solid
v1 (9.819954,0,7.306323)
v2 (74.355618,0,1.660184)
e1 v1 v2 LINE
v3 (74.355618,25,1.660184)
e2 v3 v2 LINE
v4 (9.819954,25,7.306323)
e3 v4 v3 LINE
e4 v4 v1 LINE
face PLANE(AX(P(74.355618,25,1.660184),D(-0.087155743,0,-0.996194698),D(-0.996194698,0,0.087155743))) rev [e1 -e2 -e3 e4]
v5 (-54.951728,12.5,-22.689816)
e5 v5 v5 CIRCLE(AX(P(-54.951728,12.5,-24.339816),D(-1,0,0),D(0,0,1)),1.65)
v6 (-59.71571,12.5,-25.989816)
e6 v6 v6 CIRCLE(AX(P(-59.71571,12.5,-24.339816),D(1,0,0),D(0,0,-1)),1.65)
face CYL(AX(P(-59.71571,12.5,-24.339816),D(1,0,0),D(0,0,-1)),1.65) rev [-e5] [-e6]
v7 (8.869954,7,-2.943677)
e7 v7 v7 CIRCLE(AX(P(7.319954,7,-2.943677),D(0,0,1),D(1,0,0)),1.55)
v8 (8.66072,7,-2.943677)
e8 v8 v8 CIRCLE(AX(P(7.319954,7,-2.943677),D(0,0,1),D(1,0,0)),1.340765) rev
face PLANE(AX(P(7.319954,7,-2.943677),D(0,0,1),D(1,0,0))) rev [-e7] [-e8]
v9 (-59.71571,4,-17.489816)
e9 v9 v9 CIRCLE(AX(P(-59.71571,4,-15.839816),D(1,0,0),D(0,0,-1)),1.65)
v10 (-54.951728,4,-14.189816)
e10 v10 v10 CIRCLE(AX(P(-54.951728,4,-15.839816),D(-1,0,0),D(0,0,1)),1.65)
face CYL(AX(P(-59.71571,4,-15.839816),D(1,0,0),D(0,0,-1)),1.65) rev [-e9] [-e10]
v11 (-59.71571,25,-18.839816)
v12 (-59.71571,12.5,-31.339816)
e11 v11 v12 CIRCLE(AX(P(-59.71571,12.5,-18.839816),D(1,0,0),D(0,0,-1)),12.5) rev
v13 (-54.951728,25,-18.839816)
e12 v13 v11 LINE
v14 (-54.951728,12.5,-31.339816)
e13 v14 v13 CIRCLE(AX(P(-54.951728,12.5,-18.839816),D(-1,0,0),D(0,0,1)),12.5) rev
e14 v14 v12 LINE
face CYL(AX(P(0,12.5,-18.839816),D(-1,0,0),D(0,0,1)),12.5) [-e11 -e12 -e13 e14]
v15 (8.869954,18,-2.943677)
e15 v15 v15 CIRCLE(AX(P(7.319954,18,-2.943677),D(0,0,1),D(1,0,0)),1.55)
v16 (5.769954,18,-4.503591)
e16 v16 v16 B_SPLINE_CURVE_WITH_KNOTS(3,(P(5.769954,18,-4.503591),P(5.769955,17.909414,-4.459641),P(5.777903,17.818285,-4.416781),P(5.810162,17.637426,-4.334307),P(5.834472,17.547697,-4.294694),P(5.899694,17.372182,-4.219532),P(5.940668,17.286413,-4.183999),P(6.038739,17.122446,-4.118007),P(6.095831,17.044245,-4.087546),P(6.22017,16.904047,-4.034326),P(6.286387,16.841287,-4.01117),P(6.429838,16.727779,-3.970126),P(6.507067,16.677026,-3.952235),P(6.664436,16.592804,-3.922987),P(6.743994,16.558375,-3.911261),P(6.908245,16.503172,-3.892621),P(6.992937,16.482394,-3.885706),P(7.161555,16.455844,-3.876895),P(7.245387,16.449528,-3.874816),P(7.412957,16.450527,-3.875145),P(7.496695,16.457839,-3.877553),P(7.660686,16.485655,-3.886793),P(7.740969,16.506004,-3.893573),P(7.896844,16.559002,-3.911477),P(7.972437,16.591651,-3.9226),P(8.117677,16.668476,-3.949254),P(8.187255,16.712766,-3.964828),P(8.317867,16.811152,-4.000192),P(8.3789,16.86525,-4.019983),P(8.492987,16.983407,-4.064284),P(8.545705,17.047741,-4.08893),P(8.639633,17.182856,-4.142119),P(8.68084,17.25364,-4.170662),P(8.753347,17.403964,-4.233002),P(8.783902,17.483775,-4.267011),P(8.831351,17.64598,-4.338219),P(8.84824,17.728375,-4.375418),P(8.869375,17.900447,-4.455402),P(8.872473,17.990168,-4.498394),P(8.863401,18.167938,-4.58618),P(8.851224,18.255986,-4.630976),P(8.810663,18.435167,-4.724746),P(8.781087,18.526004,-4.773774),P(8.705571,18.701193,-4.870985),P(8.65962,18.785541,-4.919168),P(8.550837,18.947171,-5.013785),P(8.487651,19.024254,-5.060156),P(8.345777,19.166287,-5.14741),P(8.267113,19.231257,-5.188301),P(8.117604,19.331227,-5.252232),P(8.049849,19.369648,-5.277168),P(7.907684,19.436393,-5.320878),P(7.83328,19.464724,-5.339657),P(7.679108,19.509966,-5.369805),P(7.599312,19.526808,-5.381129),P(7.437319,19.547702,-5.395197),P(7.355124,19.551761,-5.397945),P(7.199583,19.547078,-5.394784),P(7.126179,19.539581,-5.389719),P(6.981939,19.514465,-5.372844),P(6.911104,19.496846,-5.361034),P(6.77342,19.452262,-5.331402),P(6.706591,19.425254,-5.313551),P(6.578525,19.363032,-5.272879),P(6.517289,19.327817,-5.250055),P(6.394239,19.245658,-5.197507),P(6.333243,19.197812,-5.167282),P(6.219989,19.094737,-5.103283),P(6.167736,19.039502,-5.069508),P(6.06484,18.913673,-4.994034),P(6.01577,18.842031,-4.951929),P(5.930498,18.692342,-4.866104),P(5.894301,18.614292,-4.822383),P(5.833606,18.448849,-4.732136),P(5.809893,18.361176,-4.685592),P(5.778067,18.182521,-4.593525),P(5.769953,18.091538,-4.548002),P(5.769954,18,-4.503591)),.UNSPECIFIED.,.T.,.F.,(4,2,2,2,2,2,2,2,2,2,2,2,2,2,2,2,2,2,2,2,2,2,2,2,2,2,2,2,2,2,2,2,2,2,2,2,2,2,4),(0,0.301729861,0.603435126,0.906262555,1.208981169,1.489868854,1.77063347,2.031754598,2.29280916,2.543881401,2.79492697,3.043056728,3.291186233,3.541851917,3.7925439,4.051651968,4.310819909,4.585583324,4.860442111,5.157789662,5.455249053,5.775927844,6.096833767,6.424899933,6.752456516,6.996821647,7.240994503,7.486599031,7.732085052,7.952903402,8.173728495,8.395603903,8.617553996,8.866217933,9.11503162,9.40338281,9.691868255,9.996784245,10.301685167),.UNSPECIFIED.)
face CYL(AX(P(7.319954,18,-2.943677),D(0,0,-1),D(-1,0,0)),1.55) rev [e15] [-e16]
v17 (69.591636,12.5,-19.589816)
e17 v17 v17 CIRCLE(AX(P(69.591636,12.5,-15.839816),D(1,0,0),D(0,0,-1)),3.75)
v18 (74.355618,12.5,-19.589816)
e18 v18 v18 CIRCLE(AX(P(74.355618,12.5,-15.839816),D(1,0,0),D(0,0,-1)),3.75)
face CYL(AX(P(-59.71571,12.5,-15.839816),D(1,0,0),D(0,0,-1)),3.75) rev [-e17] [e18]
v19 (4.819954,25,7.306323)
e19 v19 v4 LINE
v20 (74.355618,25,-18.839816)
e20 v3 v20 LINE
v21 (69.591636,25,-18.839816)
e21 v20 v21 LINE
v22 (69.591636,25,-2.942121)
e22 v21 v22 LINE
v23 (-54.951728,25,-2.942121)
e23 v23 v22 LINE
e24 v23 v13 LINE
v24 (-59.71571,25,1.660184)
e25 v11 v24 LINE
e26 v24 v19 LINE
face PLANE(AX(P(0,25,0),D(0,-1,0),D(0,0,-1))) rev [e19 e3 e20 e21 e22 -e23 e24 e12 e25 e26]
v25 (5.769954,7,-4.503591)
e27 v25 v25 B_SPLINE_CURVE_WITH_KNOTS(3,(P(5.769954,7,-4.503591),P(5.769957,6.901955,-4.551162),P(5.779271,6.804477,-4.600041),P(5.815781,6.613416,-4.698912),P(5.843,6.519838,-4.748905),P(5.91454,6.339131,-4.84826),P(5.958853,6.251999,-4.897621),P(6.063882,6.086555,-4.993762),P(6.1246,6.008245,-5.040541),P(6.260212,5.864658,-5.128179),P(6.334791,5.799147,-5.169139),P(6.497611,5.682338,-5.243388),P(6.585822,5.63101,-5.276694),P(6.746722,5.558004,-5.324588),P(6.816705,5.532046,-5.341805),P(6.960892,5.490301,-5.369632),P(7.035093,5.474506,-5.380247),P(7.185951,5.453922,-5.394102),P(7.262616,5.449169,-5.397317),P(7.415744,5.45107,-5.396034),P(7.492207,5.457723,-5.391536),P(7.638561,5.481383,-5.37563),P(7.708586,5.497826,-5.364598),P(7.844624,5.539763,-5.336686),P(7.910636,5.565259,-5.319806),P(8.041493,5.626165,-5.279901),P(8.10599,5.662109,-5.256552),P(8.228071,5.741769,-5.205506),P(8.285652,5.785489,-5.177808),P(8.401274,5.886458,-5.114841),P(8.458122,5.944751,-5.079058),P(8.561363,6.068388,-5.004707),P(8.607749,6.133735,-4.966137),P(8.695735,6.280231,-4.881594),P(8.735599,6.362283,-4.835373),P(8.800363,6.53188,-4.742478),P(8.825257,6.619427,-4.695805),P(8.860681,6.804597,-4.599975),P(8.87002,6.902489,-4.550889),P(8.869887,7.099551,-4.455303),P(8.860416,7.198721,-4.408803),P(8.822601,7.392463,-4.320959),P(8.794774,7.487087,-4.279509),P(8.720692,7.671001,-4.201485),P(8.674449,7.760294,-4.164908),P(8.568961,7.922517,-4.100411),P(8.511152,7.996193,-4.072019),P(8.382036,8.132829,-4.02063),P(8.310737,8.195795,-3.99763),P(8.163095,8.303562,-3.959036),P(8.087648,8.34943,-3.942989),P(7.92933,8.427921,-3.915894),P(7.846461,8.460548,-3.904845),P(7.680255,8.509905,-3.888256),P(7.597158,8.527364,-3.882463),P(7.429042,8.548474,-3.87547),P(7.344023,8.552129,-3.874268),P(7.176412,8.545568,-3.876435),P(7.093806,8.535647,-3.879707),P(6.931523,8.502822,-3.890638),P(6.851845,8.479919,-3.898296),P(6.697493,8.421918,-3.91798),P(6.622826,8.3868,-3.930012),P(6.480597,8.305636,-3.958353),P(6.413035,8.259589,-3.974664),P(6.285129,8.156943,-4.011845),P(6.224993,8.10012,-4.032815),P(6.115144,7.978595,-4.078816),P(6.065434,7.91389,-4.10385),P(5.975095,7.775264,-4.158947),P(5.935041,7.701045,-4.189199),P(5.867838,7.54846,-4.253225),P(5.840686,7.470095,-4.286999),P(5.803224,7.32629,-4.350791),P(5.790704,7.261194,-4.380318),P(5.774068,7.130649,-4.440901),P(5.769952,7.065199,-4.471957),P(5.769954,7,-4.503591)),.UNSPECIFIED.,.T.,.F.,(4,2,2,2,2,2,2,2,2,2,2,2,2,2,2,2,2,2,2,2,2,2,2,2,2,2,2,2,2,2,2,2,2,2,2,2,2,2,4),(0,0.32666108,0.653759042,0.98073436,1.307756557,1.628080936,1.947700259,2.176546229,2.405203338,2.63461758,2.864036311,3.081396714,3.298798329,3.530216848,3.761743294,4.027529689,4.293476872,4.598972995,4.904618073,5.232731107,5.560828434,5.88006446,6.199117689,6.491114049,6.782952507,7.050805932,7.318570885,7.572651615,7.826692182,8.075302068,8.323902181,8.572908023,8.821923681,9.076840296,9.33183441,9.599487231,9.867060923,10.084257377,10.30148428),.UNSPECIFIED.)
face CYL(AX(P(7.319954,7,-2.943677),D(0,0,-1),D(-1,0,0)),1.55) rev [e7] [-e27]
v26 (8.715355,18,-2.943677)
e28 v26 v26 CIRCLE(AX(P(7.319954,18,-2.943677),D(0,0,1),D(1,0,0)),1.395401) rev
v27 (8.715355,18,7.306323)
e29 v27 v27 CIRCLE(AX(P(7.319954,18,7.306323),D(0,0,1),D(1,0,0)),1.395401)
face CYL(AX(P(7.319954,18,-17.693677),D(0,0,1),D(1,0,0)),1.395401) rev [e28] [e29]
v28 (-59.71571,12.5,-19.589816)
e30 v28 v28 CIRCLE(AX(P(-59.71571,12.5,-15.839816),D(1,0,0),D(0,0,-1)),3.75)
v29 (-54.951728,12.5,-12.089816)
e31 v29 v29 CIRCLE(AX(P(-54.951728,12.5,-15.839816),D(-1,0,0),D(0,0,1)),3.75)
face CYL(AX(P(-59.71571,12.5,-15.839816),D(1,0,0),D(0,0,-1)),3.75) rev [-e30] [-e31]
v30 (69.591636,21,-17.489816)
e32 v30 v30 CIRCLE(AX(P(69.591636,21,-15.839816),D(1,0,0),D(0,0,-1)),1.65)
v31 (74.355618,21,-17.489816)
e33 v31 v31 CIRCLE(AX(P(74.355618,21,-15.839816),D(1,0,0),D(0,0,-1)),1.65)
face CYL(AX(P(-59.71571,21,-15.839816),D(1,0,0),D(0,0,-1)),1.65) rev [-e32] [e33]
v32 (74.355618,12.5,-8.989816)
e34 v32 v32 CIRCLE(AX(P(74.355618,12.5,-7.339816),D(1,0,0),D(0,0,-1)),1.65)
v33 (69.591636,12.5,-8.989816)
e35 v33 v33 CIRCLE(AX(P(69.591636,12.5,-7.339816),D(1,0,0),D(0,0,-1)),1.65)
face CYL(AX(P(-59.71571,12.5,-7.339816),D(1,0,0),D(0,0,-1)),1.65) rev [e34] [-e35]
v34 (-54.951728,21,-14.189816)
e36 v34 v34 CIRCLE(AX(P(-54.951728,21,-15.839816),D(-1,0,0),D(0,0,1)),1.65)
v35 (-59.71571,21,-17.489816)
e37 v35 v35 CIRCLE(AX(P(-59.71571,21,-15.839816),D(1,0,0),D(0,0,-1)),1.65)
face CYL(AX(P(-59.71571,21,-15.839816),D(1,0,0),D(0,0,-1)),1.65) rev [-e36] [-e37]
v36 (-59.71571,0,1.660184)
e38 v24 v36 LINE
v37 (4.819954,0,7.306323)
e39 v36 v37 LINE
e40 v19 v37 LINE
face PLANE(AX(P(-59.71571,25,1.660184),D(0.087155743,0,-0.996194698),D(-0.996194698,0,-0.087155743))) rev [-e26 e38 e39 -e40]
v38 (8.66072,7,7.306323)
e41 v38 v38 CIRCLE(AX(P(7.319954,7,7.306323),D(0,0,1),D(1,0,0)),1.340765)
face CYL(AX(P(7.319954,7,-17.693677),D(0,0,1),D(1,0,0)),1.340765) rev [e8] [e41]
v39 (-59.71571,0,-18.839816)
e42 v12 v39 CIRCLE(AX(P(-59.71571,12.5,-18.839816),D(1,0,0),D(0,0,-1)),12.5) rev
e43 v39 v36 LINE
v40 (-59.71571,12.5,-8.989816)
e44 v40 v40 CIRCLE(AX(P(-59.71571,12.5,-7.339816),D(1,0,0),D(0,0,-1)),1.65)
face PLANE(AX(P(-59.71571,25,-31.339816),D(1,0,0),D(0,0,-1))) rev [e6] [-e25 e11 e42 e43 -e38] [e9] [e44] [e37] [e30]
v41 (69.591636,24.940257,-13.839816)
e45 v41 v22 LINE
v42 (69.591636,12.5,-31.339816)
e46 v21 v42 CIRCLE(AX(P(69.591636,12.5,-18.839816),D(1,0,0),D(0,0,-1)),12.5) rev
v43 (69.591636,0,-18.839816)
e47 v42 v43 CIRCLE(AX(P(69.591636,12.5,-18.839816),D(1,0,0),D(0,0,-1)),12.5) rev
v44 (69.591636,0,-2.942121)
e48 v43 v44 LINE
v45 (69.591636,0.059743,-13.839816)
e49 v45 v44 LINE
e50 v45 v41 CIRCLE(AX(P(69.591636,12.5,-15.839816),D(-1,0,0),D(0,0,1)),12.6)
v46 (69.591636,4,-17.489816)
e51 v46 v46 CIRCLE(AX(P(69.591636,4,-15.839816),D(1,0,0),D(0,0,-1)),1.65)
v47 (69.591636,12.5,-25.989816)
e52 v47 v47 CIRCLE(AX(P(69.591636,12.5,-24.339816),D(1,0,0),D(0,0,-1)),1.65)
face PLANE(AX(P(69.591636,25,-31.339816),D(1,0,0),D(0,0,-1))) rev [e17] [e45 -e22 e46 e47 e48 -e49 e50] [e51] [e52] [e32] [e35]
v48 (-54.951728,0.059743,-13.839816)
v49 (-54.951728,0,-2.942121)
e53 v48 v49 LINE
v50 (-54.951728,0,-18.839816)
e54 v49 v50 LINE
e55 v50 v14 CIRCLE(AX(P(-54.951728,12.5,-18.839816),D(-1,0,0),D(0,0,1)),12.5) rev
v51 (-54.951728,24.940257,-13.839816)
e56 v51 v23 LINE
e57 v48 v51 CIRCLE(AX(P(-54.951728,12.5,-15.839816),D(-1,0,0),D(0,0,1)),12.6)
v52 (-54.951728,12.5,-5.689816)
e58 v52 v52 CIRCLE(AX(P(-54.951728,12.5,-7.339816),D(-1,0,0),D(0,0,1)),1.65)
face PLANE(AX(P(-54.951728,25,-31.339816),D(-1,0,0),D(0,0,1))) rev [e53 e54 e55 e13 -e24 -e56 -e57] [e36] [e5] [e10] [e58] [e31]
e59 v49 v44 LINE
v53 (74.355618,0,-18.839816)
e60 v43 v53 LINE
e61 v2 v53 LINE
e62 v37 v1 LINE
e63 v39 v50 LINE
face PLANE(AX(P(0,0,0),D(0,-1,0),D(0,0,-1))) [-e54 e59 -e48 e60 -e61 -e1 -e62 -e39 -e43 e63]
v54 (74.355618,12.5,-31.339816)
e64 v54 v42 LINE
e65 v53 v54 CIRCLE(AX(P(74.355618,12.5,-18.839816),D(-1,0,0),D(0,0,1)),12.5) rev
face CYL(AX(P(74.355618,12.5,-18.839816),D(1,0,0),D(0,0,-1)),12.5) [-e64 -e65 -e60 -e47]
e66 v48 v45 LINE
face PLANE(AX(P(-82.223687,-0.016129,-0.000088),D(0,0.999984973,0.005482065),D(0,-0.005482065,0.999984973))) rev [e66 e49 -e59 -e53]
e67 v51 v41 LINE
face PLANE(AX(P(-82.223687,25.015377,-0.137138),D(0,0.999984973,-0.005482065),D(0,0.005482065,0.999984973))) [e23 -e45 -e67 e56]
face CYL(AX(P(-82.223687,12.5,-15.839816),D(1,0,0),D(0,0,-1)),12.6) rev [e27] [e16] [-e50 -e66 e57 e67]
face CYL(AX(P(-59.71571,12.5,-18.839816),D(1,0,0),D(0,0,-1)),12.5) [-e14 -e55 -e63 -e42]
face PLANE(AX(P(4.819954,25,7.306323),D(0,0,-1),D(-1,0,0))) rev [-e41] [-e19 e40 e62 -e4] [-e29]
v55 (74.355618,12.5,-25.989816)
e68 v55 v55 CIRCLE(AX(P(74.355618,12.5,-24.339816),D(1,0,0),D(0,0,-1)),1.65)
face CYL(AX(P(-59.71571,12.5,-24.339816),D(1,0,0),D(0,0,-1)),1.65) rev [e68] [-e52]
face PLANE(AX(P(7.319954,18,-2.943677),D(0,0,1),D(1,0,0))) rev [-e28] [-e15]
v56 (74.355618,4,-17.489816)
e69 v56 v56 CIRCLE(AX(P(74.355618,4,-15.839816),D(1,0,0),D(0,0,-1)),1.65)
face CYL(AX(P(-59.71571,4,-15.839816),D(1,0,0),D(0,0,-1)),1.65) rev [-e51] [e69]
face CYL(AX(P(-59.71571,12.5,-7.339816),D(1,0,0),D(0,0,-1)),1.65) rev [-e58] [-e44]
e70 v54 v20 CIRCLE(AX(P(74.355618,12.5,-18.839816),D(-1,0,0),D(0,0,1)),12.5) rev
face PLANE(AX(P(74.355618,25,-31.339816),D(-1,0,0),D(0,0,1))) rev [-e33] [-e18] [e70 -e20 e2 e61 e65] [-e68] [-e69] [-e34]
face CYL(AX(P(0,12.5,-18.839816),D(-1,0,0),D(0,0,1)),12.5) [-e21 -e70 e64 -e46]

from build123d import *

# Parameters (mm, degrees)
RESSALTO_EXTRUS_O1_DEPTH = 25
ESBO_O2_R                = 3.75
ESBO_O2_R_2              = 1.65
CORTE_EXTRUS_O1_DEPTH    = 140.936789771
FILETE1_R                = 12.5
RESSALTO_EXTRUS_O2_REACH = 137.379
RESSALTO_EXTRUS_O3_DEPTH = 25
ESBO_O3_R                = 1.340765279
ESBO_O3_R_2              = 1.395401155
CORTE_EXTRUS_O4_DEPTH    = 25
ESBO_O10_R               = 1.55
CORTE_EXTRUS_O5_DEPTH    = 3


with BuildPart() as part:
    # Esboço1 → Ressalto-extrusão1 (new body)
    with BuildSketch(Plane(origin=(0, 0, 0), x_dir=(1, 0, 0), z_dir=(0, 1, 0))):
        Polygon((-59.715709909, 31.339816021), (-59.715709909, -1.660183979), (4.819954225, -7.306322984), (9.819954225, -7.306322984), (74.355618358, -1.660183979), (74.355618358, 31.339816021), (69.59163611, 31.339816021), (69.59163611, 2.942120769), (9.819954225, -2.287223796), (4.819954225, -2.287223796), (-54.951727661, 2.942120769), (-54.951727661, 31.339816021), align=None)
    extrude(amount=RESSALTO_EXTRUS_O1_DEPTH)

    # Esboço2 → Corte-extrusão1 (cut, through all)
    with BuildSketch(Plane(origin=(74.355618358, 0, 0), x_dir=(0, 0, -1), z_dir=(1, 0, 0))):
        with Locations((15.839816021, 12.5)):
            Circle(ESBO_O2_R)
        with Locations((24.339816021, 12.5)):
            Circle(ESBO_O2_R_2)
        with Locations((15.839816021, 4)):
            Circle(ESBO_O2_R_2)
        with Locations((15.839816021, 21)):
            Circle(ESBO_O2_R_2)
        with Locations((7.339816021, 12.5)):
            Circle(ESBO_O2_R_2)
    extrude(amount=-CORTE_EXTRUS_O1_DEPTH, mode=Mode.SUBTRACT)

    # Filete1
    filete1_edges = [part.edges().sort_by_distance(p)[0] for p in [
        (-57.333718785, 25, -31.339816021),
        (-57.333718785, 0, -31.339816021),
        (71.973627234, 25, -31.339816021),
        (71.973627234, 0, -31.339816021),
    ]]
    fillet(filete1_edges, radius=FILETE1_R - 0.0001)  # a hair under: the kernel refuses the full size

    # Ressalto-extrusão2: up to this face of the body (flat: up to its plane)
    ressalto_extrus_o2_end = Plane(part.part.faces().sort_by_distance((-54.951727661, 0.378342318, -10.891018395))[0])
    # Esboço6 → Ressalto-extrusão2 (add, up to the picked face)
    with BuildSketch(Plane.ZY.offset(-69.59163611), mode=Mode.PRIVATE) as ressalto_extrus_o2_sk1:
        with BuildLine():
            ThreePointArc((-13.839816021, 0.059742768), (-3.239816021, 12.5), (-13.839816021, 24.940257232))
            Line((-13.839816021, 24.940257232), (-2.942120769, 25))
            Line((-2.942120769, 25), (-2.942120769, 0))
            Line((-2.942120769, 0), (-13.839816021, 0.059742768))
        make_face()
    ressalto_extrus_o2_tool1 = split(extrude(ressalto_extrus_o2_sk1.sketch, amount=RESSALTO_EXTRUS_O2_REACH, mode=Mode.PRIVATE), bisect_by=ressalto_extrus_o2_end, keep=Keep.BOTH, mode=Mode.PRIVATE)
    add(ressalto_extrus_o2_tool1.solids().sort_by(Axis((69.591636, 24.697413, -8.389473), (-1, 0, 0)))[0])

    # Esboço8 → Ressalto-extrusão3 (add)
    with BuildSketch(Plane(origin=(0, 0, 0), x_dir=(-1, 0, 0), z_dir=(0, -1, 0))):
        Polygon((54.951727661, 2.942120769), (-4.819954225, -2.287223796), (-9.819954225, -2.287223796), (-69.59163611, 2.942120769), align=None)
    extrude(amount=-RESSALTO_EXTRUS_O3_DEPTH)

    # Esboço3 → Corte-extrusão4 (cut)
    with BuildSketch(Plane.XY.offset(7.306322984)):
        with Locations((7.319954225, 7)):
            Circle(ESBO_O3_R)
        with Locations((7.319954225, 18)):
            Circle(ESBO_O3_R_2)
    extrude(amount=-CORTE_EXTRUS_O4_DEPTH, mode=Mode.SUBTRACT)

    # Esboço10 → Corte-extrusão5 (cut)
    with BuildSketch(Plane.XY.offset(-5.943677016)):
        with Locations(Location((7.319954225, 7, 0), (0, 0, 180))):
            Circle(ESBO_O10_R)
        with Locations(Location((7.319954225, 18, 0), (0, 0, 180))):
            Circle(ESBO_O10_R)
    extrude(amount=CORTE_EXTRUS_O5_DEPTH, mode=Mode.SUBTRACT)


solid = part.part
